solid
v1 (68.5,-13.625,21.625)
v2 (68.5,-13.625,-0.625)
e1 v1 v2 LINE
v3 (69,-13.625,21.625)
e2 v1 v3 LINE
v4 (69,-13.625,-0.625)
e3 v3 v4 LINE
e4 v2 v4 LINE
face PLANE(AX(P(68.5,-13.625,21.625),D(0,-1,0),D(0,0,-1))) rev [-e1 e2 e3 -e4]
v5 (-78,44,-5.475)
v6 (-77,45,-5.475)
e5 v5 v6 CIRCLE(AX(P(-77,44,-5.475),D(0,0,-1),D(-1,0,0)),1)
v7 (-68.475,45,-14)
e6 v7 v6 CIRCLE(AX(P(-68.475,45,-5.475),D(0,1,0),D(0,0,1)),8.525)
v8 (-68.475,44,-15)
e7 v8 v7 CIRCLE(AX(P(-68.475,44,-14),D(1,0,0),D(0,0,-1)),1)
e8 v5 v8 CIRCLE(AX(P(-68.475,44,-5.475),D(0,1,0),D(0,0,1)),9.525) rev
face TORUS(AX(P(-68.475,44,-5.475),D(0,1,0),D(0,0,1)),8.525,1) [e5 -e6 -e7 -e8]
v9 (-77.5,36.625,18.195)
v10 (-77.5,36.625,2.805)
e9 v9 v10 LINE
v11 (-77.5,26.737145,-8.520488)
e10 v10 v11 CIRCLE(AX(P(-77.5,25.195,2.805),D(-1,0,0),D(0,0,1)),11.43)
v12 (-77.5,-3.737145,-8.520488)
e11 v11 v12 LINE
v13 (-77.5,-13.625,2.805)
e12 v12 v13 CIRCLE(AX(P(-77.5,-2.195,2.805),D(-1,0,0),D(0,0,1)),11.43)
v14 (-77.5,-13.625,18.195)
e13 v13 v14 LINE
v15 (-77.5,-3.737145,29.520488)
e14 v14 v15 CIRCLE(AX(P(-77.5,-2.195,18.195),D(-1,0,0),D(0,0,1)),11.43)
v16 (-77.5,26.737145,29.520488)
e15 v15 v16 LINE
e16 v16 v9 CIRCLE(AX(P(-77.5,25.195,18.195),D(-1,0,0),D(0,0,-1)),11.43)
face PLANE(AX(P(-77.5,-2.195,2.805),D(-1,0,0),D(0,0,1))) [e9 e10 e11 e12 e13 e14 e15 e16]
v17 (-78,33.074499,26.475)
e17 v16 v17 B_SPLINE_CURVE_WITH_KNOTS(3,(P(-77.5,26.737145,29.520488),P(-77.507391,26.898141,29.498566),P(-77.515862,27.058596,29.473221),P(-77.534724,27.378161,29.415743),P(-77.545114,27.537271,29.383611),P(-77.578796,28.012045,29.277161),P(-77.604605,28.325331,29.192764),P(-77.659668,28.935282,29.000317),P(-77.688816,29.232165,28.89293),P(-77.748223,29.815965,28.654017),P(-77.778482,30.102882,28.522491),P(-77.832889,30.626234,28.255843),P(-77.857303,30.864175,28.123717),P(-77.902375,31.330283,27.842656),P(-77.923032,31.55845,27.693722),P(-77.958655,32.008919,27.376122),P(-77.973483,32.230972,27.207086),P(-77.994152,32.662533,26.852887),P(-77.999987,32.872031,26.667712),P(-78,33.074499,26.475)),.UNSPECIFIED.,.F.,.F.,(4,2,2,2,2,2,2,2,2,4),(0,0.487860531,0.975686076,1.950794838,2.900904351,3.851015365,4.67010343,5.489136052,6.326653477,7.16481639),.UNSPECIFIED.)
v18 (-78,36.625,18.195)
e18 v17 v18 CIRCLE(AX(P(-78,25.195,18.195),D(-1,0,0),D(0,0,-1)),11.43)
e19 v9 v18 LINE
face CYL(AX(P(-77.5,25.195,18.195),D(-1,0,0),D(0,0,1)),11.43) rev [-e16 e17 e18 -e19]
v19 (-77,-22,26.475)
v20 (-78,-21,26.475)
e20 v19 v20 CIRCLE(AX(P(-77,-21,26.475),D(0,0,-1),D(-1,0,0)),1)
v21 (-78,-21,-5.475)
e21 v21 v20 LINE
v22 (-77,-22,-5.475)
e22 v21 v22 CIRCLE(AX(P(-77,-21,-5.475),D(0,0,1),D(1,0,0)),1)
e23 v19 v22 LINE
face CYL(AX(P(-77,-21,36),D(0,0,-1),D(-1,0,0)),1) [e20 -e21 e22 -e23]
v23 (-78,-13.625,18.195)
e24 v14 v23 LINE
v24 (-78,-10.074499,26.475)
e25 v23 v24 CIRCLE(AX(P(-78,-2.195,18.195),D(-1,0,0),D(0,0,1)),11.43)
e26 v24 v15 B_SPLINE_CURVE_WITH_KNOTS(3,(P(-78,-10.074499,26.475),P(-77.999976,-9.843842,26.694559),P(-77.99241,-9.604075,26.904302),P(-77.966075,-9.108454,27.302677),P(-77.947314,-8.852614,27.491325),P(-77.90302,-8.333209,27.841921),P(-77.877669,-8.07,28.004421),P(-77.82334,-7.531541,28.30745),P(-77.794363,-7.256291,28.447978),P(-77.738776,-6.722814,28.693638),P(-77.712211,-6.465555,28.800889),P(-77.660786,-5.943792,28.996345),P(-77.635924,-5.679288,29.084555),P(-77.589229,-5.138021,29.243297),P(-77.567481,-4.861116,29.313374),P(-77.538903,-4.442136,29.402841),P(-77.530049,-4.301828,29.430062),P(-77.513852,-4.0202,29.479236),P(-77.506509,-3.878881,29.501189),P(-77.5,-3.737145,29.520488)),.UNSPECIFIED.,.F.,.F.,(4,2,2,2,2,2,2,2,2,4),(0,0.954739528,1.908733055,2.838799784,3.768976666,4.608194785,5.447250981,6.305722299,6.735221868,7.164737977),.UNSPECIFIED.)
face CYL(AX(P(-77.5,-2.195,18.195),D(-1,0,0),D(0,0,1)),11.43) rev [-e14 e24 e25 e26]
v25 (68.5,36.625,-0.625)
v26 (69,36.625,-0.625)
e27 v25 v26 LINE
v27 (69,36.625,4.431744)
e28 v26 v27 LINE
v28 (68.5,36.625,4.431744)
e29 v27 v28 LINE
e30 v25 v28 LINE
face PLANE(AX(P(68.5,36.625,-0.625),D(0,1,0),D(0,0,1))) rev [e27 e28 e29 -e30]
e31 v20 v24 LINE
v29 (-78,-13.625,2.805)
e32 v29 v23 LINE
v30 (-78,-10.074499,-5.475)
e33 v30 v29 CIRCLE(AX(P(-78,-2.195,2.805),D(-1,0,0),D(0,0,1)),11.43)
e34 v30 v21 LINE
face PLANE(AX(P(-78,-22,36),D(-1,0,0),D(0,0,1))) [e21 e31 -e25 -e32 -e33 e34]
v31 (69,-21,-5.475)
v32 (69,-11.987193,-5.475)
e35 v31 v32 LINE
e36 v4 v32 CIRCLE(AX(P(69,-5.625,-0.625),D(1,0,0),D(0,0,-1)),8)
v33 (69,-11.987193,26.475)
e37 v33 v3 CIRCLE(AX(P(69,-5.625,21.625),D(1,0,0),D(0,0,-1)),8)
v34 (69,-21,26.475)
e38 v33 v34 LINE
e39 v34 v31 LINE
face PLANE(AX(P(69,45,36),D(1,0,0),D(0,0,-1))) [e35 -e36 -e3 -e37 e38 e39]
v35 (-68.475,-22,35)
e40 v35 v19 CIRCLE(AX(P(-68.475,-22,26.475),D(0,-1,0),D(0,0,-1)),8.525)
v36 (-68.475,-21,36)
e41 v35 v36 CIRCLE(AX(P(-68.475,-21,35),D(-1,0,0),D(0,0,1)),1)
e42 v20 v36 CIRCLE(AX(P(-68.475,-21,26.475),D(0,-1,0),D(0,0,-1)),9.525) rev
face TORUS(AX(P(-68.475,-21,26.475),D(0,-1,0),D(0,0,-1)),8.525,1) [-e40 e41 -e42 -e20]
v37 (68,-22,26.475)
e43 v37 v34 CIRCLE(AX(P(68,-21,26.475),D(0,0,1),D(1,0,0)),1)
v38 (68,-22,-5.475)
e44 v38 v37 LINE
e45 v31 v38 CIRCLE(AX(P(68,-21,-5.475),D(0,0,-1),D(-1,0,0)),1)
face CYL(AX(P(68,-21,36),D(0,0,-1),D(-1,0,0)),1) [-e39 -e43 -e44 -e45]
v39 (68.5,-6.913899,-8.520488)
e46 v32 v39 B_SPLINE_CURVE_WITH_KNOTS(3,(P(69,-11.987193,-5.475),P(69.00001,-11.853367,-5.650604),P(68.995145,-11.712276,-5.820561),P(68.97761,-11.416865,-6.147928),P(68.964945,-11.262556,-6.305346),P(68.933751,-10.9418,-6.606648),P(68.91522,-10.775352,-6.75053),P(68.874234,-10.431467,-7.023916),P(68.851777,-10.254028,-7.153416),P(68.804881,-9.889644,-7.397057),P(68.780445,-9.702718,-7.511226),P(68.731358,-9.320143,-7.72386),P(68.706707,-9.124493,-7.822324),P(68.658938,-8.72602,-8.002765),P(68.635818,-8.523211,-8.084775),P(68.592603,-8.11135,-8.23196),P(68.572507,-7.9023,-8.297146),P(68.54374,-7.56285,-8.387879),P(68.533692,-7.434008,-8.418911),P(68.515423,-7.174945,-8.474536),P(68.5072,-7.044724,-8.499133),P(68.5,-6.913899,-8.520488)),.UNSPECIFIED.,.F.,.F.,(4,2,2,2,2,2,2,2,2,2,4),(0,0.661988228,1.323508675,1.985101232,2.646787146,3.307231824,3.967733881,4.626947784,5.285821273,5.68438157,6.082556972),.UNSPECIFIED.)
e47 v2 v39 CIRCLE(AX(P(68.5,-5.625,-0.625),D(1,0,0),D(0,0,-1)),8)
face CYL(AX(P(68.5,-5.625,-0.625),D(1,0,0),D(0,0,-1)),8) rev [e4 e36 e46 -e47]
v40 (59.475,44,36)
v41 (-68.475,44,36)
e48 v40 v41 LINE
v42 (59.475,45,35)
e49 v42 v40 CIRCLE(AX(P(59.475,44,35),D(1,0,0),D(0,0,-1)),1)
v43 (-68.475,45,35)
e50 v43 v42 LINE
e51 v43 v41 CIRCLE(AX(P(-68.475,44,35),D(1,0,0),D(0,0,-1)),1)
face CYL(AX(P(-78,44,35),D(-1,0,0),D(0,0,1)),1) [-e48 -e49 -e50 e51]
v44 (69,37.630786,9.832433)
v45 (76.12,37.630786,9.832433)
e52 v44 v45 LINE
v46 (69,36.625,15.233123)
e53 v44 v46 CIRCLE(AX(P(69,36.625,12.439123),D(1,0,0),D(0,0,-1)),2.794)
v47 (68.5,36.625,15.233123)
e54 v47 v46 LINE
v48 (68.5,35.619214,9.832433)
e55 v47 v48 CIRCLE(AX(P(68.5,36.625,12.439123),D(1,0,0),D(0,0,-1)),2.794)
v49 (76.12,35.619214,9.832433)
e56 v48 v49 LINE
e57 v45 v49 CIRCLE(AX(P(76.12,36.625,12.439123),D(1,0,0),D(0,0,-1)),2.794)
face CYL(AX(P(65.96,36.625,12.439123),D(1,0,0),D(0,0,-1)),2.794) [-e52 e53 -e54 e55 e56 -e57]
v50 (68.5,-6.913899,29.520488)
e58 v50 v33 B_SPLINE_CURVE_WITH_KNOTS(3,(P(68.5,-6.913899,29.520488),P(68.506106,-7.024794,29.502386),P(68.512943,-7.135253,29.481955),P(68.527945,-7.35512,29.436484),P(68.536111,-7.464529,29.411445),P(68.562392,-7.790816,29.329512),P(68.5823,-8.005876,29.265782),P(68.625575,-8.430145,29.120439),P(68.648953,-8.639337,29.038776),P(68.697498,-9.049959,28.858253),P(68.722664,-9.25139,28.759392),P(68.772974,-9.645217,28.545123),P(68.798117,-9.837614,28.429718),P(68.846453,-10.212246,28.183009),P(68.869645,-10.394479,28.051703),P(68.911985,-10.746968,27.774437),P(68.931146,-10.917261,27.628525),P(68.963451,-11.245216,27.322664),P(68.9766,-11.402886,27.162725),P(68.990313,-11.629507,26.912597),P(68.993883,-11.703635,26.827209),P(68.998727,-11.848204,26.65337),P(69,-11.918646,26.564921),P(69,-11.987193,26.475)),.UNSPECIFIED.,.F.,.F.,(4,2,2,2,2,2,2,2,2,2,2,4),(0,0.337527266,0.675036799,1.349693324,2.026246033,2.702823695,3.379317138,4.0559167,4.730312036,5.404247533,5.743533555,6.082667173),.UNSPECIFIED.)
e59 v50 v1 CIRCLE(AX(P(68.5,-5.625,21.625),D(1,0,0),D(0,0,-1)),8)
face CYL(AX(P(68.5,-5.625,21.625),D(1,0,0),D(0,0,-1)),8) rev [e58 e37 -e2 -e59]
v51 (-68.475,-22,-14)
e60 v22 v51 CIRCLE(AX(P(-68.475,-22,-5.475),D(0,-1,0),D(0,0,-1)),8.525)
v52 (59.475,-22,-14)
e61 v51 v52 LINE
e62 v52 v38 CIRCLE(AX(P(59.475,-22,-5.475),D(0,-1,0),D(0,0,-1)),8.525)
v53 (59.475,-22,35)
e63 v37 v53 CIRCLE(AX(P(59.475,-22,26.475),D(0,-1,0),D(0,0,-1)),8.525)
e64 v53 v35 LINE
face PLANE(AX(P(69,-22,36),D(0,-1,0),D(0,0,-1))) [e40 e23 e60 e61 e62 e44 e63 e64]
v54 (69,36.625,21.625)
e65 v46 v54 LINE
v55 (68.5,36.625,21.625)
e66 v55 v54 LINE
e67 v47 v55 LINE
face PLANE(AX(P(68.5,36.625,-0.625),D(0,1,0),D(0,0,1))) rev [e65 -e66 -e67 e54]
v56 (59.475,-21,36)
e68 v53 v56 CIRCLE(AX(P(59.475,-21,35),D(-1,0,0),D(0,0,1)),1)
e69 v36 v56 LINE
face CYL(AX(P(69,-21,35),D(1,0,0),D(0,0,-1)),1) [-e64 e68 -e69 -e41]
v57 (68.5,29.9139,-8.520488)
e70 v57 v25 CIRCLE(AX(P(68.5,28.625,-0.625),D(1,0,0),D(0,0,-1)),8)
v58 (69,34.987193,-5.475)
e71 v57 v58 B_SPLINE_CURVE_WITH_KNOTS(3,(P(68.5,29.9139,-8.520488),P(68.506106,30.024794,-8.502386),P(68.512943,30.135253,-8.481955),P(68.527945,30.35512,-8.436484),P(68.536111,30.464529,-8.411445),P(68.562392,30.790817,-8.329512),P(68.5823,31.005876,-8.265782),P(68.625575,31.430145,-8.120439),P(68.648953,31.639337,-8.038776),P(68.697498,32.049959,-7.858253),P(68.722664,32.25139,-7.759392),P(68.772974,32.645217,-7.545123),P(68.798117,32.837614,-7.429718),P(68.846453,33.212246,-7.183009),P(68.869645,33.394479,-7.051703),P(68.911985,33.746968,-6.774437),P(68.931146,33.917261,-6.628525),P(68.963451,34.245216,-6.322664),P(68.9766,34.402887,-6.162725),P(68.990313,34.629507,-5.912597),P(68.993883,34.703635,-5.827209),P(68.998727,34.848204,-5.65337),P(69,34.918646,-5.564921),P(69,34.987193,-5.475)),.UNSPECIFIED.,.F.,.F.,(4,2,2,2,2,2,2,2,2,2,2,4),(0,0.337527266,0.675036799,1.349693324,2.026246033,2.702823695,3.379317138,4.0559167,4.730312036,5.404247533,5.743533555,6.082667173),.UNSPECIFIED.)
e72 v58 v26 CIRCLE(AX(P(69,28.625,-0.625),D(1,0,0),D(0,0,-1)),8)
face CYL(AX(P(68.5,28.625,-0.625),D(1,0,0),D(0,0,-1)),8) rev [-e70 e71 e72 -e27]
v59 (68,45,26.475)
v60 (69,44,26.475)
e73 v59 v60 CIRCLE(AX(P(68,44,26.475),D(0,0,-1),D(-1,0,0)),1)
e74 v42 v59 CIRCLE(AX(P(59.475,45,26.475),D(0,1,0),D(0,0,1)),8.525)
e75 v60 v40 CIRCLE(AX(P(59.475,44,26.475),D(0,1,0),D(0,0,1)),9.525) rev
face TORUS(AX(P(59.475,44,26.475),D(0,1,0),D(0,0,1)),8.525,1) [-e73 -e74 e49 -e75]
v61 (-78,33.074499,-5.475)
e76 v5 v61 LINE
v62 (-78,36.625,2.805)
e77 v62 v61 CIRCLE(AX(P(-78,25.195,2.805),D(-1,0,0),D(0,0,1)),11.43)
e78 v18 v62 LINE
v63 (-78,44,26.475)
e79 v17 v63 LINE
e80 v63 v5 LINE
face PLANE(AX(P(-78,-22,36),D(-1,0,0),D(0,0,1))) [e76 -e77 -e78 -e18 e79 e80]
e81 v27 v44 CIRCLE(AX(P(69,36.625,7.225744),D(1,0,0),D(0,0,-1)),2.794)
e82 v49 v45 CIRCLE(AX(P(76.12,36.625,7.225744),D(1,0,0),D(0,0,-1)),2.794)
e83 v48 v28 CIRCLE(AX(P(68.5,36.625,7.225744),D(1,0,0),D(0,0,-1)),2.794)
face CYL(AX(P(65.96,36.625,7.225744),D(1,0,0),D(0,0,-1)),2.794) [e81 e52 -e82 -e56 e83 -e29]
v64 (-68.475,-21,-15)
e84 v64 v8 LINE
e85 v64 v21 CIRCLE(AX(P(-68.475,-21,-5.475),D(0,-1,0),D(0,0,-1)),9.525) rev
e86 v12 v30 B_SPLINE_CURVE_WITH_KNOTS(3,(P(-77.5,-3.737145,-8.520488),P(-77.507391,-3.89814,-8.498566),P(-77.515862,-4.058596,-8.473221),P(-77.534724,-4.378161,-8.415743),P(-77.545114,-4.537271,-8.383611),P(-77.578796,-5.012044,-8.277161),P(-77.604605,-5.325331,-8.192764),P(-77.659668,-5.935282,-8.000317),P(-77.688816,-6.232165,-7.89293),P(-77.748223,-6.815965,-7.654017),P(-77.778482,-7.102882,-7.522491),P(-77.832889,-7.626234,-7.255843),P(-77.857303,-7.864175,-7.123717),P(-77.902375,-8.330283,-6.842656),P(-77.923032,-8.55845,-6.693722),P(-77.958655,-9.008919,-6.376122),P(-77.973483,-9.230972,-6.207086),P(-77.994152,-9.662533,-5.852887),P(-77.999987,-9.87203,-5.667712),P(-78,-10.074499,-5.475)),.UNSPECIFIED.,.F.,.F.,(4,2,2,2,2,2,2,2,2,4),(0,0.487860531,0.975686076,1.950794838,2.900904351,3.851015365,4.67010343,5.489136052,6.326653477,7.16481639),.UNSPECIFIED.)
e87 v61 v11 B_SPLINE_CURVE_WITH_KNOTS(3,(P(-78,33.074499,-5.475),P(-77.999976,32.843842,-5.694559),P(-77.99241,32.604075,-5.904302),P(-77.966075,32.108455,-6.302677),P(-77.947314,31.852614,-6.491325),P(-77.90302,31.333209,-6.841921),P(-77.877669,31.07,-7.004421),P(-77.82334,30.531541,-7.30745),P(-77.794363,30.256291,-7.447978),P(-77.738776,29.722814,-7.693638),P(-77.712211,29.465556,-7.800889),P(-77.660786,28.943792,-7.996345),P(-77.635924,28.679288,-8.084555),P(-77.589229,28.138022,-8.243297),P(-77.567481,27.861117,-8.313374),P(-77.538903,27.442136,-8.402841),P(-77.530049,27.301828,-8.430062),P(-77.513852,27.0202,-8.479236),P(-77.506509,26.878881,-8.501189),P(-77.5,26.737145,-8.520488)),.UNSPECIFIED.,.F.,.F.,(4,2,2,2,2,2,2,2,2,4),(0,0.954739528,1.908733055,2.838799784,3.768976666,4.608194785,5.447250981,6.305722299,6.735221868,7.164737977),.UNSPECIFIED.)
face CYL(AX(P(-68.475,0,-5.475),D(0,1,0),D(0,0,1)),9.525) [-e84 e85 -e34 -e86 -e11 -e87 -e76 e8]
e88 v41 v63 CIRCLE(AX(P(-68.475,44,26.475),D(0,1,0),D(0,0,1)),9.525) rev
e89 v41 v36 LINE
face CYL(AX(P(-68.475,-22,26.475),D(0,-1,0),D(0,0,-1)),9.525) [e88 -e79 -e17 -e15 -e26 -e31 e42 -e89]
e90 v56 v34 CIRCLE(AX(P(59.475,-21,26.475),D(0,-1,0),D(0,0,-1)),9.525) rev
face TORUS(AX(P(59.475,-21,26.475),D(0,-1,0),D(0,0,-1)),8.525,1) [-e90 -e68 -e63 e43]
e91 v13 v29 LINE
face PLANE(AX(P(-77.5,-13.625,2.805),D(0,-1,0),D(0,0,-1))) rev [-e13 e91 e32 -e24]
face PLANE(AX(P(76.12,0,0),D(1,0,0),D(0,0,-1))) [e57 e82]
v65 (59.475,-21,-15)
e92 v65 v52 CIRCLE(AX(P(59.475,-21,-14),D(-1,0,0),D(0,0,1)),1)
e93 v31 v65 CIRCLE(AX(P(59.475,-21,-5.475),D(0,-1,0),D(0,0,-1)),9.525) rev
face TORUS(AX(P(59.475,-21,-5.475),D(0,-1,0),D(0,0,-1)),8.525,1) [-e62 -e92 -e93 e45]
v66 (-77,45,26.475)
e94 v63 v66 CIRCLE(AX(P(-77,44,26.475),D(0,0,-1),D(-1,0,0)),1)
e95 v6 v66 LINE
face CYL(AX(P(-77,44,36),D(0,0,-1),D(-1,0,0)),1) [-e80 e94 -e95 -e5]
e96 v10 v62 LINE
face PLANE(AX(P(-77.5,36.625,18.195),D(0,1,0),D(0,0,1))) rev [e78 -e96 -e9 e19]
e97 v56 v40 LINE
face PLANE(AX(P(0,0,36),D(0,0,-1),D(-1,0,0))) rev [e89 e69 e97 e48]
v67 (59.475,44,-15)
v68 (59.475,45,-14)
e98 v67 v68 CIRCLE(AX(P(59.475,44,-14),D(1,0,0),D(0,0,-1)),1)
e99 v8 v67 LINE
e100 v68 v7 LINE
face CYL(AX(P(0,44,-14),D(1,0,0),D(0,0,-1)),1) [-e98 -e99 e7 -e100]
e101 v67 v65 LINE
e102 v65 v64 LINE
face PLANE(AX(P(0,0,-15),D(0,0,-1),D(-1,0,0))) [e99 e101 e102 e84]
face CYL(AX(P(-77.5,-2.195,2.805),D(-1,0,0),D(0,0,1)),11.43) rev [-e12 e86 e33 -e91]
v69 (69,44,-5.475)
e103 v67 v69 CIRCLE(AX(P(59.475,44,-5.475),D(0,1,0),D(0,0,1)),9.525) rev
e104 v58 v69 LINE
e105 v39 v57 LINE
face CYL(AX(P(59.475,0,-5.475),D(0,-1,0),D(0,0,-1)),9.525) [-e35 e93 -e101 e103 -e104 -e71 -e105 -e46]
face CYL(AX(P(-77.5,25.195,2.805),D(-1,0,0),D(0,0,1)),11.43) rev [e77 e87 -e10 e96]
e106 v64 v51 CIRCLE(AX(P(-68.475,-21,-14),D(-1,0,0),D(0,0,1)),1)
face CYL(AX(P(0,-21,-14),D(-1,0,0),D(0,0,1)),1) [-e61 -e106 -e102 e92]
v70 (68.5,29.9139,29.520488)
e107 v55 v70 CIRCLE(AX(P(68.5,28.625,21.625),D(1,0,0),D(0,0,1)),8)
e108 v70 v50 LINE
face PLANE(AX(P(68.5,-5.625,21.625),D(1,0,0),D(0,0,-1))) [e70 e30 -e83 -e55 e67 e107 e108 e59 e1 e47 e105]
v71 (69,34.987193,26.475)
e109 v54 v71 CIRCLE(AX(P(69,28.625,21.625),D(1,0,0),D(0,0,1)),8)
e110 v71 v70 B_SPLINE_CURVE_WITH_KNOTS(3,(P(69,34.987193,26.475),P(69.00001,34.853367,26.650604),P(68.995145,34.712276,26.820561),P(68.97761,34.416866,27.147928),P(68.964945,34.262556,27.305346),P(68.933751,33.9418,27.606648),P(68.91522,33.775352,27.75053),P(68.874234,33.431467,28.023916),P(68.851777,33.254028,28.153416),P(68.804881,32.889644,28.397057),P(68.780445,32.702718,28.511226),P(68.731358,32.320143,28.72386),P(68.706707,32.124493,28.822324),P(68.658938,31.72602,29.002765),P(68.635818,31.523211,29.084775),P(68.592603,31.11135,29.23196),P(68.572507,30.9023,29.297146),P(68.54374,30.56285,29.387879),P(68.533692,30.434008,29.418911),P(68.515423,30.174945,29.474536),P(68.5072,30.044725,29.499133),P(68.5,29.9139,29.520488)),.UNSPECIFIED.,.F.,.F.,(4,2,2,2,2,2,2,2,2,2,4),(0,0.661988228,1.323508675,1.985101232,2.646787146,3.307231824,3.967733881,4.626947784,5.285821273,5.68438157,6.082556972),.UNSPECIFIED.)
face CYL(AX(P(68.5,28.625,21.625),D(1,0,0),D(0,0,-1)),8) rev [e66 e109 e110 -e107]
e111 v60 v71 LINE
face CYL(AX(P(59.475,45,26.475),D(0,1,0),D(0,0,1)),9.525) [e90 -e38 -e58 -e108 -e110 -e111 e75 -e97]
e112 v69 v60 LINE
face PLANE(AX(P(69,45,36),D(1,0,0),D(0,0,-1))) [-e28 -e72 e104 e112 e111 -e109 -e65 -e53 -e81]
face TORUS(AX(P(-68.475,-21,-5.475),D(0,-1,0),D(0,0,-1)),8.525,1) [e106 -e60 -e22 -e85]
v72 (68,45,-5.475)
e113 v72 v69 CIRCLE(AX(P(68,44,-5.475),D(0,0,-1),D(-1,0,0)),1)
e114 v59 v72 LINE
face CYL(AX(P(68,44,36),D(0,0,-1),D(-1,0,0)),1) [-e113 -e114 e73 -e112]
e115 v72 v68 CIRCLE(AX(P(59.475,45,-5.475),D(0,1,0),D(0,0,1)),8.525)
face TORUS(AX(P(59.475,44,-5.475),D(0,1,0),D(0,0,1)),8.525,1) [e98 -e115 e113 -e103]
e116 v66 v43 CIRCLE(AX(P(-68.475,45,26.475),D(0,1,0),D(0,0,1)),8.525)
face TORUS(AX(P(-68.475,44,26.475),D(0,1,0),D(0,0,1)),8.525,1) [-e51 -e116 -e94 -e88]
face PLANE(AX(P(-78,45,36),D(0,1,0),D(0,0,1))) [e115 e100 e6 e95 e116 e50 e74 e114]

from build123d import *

# Parameters (mm, degrees)
SKETCH1_W                = 147
SKETCH1_H                = 67.000000112
BOSS_EXTRUDE1_DEPTH      = 51
CUT_EXTRUDE1_DEPTH       = 0.5
CUT_EXTRUDE2_DEPTH       = 0.5
FILLET1_R                = 9.525
FILLET2_R                = 1
BOSS_EXTRUDE2_DEPTH      = 7.62
BOSS_EXTRUDE2_DEPTH_BACK = 2.54


with BuildPart() as part:
    # Sketch1 → Boss-Extrude1 (new body)
    with BuildSketch(Plane(origin=(0, 0, -15), x_dir=(-1, 0, 0), z_dir=(0, 0, -1))):
        with Locations((4.5, 11.500000056)):
            Rectangle(SKETCH1_W, SKETCH1_H)
    extrude(amount=-BOSS_EXTRUDE1_DEPTH)

    # Sketch2 → Cut-Extrude1 (cut)
    with BuildSketch(Plane(origin=(69, 0, 0), x_dir=(0, 0, -1), z_dir=(1, 0, 0))):
        with BuildLine():
            Line((-29.625, 28.625000098), (-29.625, -5.624999986))
            ThreePointArc((-29.625, -5.624999986), (-27.281854249, -11.281854235), (-21.625, -13.624999986))
            Line((-21.625, -13.624999986), (0.625, -13.624999986))
            ThreePointArc((0.625, -13.624999986), (6.281854249, -11.281854235), (8.625, -5.624999986))
            Line((8.625, -5.624999986), (8.625, 28.625000098))
            ThreePointArc((8.625, 28.625000098), (6.281854249, 34.281854347), (0.625, 36.625000098))
            Line((0.625, 36.625000098), (-21.625, 36.625000098))
            ThreePointArc((-21.625, 36.625000098), (-27.281854249, 34.281854347), (-29.625, 28.625000098))
        make_face()
    extrude(amount=-CUT_EXTRUDE1_DEPTH, mode=Mode.SUBTRACT)

    # Sketch3 → Cut-Extrude2 (cut)
    with BuildSketch(Plane.ZY.offset(78)):
        with BuildLine():
            Line((18.195, 36.625000098), (2.805, 36.625000098))
            ThreePointArc((2.805, 36.625000098), (-5.277230509, 33.277230607), (-8.625, 25.195000098))
            Line((-8.625, 25.195000098), (-8.625, -2.194999986))
            ThreePointArc((-8.625, -2.194999986), (-5.277230509, -10.277230495), (2.805, -13.624999986))
            Line((2.805, -13.624999986), (18.195, -13.624999986))
            ThreePointArc((18.195, -13.624999986), (26.277230509, -10.277230495), (29.625, -2.194999986))
            Line((29.625, -2.194999986), (29.625, 25.195000098))
            ThreePointArc((29.625, 25.195000098), (26.277230509, 33.277230607), (18.195, 36.625000098))
        make_face()
    extrude(amount=-CUT_EXTRUDE2_DEPTH, mode=Mode.SUBTRACT)

    # Fillet1
    # the kernel refuses this fillet: 9.525 mm, written as the material it takes off along each edge
    with BuildSketch(Plane(origin=(-78, -45.8125, -15), x_dir=(0, 0, 1), z_dir=(0, 1, 0)), Plane(origin=(69, 68.812500112, -15), x_dir=(0, 0, 1), z_dir=(0, -1, 0))) as fillet1_piece_1:
        with BuildLine():
            CenterArc((FILLET1_R, FILLET1_R), FILLET1_R, 180, 90)
            Line((0, FILLET1_R), (0, 0))
            Line((0, 0), (FILLET1_R, 0))
        make_face()
    extrude(amount=114.625000112, mode=Mode.SUBTRACT)
    with BuildSketch(Plane(origin=(-78, -45.8125, 36), x_dir=(0, 0, -1), z_dir=(0, 1, 0)), Plane(origin=(69, 68.812500112, 36), x_dir=(0, 0, -1), z_dir=(0, -1, 0))) as fillet1_piece_2:
        with BuildLine():
            CenterArc((FILLET1_R, -FILLET1_R), FILLET1_R, 90, 90)
            Line((0, -FILLET1_R), (0, 0))
            Line((0, 0), (FILLET1_R, 0))
        make_face()
    extrude(amount=114.625000112, mode=Mode.SUBTRACT)

    # Fillet2
    fillet2_edges = [part.edges().sort_by_distance(p)[0] for p in [
        (-4.5, -22, -15),
        (-4.5, 45.000000112, -15),
        (-78, 45.000000112, 10.5),
        (-4.5, 45.000000112, 36),
        (69, 45.000000112, 10.5),
        (66.210192091, 45.000000112, 33.210192091),
        (66.210192091, 45.000000112, -12.210192091),
        (-75.210192091, 45.000000112, 33.210192091),
        (-75.210192091, 45.000000112, -12.210192091),
        (-78, -22, 10.5),
        (69, -22, 10.5),
        (-4.5, -22, 36),
        (66.210192091, -22, 33.210192091),
        (66.210192091, -22, -12.210192091),
        (-75.210192091, -22, 33.210192091),
        (-75.210192091, -22, -12.210192091),
    ]]
    fillet(fillet2_edges, radius=FILLET2_R)

    # Sketch5 → Boss-Extrude2 (add, two sides: drawn at the far end of the back side and taken through both)
    with BuildSketch(Plane(origin=(68.5, 0, 0), x_dir=(0, 0, -1), z_dir=(1, 0, 0)).offset(-BOSS_EXTRUDE2_DEPTH_BACK)):
        with BuildLine():
            Line((-10.019743612, 36.625000098), (-9.645122715, 36.625000098))
            ThreePointArc((-9.645122715, 36.625000098), (-9.692349462, 37.136539634), (-9.832433164, 37.63078615))
            ThreePointArc((-9.832433164, 37.63078615), (-9.972516865, 37.136539634), (-10.019743612, 36.625000098))
        make_face()
        with BuildLine():
            Line((-4.431743612, 36.625000098), (-9.645122715, 36.625000098))
            ThreePointArc((-9.645122715, 36.625000098), (-9.692349462, 36.113460562), (-9.832433164, 35.619214046))
            ThreePointArc((-9.832433164, 35.619214046), (-6.714204076, 33.878226845), (-4.431743612, 36.625000098))
        make_face()
        with BuildLine():
            ThreePointArc((-9.832433164, 37.63078615), (-9.692349462, 37.136539634), (-9.645122715, 36.625000098))
            Line((-9.645122715, 36.625000098), (-4.431743612, 36.625000098))
            ThreePointArc((-4.431743612, 36.625000098), (-6.714204076, 39.371773351), (-9.832433164, 37.63078615))
        make_face()
        with BuildLine():
            ThreePointArc((-9.832433164, 35.619214046), (-9.692349462, 36.113460562), (-9.645122715, 36.625000098))
            Line((-9.645122715, 36.625000098), (-10.019743612, 36.625000098))
            ThreePointArc((-10.019743612, 36.625000098), (-9.972516865, 36.113460562), (-9.832433164, 35.619214046))
        make_face()
        with BuildLine():
            ThreePointArc((-10.019743612, 36.625000098), (-9.972516865, 37.136539634), (-9.832433164, 37.63078615))
            ThreePointArc((-9.832433164, 37.63078615), (-12.950662251, 39.371773351), (-15.233122715, 36.625000098))
            Line((-15.233122715, 36.625000098), (-10.019743612, 36.625000098))
        make_face()
        with BuildLine():
            ThreePointArc((-15.233122715, 36.625000098), (-12.950662251, 33.878226845), (-9.832433164, 35.619214046))
            ThreePointArc((-9.832433164, 35.619214046), (-9.972516865, 36.113460562), (-10.019743612, 36.625000098))
            Line((-10.019743612, 36.625000098), (-15.233122715, 36.625000098))
        make_face()
    extrude(amount=BOSS_EXTRUDE2_DEPTH + BOSS_EXTRUDE2_DEPTH_BACK)


solid = part.part
